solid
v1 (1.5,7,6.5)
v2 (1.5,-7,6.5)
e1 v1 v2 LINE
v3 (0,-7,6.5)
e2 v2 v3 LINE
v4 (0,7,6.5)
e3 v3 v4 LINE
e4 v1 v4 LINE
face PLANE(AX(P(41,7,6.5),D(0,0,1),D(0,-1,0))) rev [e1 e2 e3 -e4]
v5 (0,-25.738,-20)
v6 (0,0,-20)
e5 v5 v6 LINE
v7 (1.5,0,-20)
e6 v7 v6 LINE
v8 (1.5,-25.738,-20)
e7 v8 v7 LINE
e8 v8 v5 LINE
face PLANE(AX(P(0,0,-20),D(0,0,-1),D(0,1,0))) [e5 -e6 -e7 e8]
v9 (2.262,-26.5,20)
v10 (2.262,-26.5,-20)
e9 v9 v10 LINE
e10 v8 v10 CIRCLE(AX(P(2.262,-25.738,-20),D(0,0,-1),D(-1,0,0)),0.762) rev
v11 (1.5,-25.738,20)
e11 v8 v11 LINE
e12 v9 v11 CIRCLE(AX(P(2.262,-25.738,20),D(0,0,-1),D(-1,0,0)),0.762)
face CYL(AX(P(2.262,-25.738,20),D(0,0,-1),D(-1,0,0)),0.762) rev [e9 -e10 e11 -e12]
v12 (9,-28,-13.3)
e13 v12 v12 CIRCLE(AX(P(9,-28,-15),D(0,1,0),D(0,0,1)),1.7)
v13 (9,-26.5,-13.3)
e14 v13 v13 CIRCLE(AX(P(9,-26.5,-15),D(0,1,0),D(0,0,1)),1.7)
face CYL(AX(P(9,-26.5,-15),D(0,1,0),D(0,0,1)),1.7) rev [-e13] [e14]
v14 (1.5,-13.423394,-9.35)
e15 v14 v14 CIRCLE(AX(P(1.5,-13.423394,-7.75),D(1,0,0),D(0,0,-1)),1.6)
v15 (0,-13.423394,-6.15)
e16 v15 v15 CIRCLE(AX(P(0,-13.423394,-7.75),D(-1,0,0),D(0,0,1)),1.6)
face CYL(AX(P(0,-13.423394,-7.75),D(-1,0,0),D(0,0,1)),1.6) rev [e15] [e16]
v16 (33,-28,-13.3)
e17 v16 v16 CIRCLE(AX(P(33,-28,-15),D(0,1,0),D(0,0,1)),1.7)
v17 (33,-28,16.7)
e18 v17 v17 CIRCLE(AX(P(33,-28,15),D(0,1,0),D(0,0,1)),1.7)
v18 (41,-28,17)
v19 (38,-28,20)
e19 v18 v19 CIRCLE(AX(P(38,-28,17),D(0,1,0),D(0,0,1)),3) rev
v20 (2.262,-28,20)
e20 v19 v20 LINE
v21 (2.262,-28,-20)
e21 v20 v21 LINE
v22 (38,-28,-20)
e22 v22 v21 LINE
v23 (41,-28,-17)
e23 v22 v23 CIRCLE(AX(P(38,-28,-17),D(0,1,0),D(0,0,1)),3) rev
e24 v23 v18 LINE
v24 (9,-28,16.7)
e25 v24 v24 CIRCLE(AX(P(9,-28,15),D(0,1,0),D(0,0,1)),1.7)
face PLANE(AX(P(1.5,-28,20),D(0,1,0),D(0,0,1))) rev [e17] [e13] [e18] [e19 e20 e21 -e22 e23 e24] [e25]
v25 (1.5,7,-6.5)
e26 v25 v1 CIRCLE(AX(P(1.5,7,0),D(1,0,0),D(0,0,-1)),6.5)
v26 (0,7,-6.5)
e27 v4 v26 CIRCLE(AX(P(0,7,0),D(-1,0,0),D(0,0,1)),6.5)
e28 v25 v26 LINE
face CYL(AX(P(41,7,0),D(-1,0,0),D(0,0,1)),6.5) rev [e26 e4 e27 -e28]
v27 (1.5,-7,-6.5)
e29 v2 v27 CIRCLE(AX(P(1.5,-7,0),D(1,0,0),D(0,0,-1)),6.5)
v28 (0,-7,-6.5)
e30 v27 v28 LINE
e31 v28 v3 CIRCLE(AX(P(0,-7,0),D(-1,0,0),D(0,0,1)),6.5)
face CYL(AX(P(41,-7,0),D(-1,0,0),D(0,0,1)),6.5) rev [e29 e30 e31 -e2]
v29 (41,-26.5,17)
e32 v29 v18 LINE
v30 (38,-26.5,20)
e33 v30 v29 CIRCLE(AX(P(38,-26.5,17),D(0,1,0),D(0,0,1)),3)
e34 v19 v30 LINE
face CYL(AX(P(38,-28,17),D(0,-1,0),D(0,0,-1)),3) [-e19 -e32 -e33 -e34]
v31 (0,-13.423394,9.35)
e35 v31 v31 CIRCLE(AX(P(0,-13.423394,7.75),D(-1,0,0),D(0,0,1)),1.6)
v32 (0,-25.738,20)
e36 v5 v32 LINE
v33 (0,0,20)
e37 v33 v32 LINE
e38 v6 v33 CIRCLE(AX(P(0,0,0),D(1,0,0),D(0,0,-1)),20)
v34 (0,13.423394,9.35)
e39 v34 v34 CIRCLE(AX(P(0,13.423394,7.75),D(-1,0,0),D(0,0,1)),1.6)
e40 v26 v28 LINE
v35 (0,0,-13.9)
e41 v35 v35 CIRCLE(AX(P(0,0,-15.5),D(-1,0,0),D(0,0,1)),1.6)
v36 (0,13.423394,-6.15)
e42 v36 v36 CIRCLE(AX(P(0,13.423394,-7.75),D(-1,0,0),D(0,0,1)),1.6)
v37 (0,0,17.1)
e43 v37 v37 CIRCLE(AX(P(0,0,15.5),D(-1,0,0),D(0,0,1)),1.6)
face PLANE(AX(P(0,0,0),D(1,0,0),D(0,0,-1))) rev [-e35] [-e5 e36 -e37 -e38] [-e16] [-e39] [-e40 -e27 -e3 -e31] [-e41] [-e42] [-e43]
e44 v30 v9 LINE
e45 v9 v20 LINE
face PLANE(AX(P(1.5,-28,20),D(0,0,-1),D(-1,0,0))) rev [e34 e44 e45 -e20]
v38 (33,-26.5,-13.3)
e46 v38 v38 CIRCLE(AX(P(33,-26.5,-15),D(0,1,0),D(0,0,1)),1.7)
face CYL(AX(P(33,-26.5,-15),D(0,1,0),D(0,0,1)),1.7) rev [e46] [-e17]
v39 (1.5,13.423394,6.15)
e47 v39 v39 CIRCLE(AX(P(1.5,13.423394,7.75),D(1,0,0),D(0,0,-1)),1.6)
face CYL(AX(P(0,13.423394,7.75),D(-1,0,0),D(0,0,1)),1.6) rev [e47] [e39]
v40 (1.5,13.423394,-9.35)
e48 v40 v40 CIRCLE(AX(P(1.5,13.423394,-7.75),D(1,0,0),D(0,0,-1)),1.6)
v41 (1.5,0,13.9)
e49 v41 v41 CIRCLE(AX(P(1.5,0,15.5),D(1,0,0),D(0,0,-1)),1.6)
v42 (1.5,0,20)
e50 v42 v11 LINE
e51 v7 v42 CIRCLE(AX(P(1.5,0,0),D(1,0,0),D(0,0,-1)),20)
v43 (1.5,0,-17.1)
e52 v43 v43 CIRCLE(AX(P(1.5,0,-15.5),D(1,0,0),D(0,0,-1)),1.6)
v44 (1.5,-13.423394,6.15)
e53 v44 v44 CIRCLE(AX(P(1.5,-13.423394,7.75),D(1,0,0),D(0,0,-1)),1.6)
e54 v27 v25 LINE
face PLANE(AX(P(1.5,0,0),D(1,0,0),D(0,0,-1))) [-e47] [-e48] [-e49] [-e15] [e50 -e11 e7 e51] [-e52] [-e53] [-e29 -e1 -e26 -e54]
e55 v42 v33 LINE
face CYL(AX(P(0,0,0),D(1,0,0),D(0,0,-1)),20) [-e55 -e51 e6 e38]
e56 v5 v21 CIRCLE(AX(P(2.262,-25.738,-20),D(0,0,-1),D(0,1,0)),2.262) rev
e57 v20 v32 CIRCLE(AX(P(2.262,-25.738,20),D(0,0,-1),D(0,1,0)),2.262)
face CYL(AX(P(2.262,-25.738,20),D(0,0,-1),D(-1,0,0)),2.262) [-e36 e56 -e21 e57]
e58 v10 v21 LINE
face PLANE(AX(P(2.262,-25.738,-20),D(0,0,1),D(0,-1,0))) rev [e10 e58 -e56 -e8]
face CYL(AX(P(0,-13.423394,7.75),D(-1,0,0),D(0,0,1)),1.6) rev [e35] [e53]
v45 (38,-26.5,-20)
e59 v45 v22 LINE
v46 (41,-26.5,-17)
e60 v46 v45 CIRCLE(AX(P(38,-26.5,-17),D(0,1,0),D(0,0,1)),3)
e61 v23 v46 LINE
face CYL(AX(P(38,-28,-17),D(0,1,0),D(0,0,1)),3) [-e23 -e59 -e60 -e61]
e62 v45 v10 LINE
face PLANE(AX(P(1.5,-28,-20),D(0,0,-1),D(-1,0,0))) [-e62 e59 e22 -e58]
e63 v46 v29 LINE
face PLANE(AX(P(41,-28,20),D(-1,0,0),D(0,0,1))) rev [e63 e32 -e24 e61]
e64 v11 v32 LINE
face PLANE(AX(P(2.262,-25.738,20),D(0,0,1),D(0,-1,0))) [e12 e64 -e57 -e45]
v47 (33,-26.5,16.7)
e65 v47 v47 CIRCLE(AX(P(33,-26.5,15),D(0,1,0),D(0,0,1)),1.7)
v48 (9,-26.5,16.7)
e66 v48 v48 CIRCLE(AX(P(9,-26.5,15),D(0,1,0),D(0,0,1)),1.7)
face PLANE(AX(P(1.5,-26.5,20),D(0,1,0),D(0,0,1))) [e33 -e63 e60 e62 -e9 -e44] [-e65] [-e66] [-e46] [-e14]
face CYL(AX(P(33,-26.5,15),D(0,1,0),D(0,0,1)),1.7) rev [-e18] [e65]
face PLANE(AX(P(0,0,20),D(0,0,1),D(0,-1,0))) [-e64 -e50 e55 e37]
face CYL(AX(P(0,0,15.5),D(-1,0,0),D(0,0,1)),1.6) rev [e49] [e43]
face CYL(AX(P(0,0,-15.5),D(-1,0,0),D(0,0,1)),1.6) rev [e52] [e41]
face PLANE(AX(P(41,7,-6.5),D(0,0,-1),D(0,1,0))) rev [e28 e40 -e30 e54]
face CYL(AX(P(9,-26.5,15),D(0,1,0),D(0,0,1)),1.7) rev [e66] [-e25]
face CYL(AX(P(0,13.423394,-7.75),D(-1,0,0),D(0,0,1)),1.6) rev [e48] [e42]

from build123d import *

# Parameters (mm, degrees)
BOSS_EXTRUDE1_DEPTH    = 1.5
SKETCH2_W              = 41
SKETCH2_H              = 40
BOSS_EXTRUDE2_DEPTH    = 1.5
CONVERT_SOLID1_START   = -20
CONVERT_SOLID1_DEPTH   = 40
CONVERT_SOLID1_2_DEPTH = 40
M3_CLEARANCE_HOLE1_D   = 3.2
CIRPATTERN1_COUNT      = 6
CUT_EXTRUDE1_DEPTH     = 54.525694764
M3_CLEARANCE_HOLE2_D   = 3.4
LPATTERN1_COUNT        = 2
LPATTERN1_PITCH        = 24
LPATTERN1_COPY_1_D     = 3.4
FILLET1_R              = 3


# Read off the part's stored shape, not the designer's step: Convert-Solid1
with BuildPart() as part:
    # Sketch1 → Boss-Extrude1 (new body)
    with BuildSketch(Plane(origin=(0, 0, 0), x_dir=(0, 0, -1), z_dir=(1, 0, 0))):
        with BuildLine():
            Line((-20, 0), (-20, -28))
            Line((-20, -28), (20, -28))
            Line((20, -28), (20, 0))
            ThreePointArc((20, 0), (0, 20), (-20, 0))
        make_face()
    extrude(amount=BOSS_EXTRUDE1_DEPTH)

    # Sketch2 → Boss-Extrude2 (add)
    with BuildSketch(Plane.XZ.offset(28)):
        with Locations((20.5, 0)):
            Rectangle(SKETCH2_W, SKETCH2_H)
    extrude(amount=-BOSS_EXTRUDE2_DEPTH)

    # Convert-Solid1 outline → Convert-Solid1 (cut)
    with BuildSketch(Plane.XY.offset(CONVERT_SOLID1_START)):
        with BuildLine():
            Line((0, -28), (2.262, -28))
            ThreePointArc((2.262, -28), (0.662524461, -27.337475539), (0, -25.738))
            Line((0, -25.738), (0, -28))
        make_face()
    extrude(amount=CONVERT_SOLID1_DEPTH, mode=Mode.SUBTRACT)

    # Convert-Solid1 2 outline → Convert-Solid1 2 (add)
    with BuildSketch(Plane.XY.offset(CONVERT_SOLID1_START)):
        with BuildLine():
            Line((1.5, -26.5), (2.262, -26.5))
            ThreePointArc((2.262, -26.5), (1.723184633, -26.276815367), (1.5, -25.738))
            Line((1.5, -25.738), (1.5, -26.5))
        make_face()
    extrude(amount=CONVERT_SOLID1_2_DEPTH)

    # M3 Clearance Hole1 (through all)
    with Locations(Plane.ZY):
        with Locations((-15.5, 0)):
            m3_clearance_hole1 = Hole(M3_CLEARANCE_HOLE1_D / 2)

    # CirPattern1: M3 Clearance Hole1 ×6 about axis
    cirpattern1_axis = Axis((0, 0, 0), (1, 0, 0))
    for i in range(1, CIRPATTERN1_COUNT):
        add(m3_clearance_hole1.rotate(cirpattern1_axis, i * 360 / CIRPATTERN1_COUNT), mode=Mode.SUBTRACT)

    # Sketch9 → Cut-Extrude1 (cut, through all)
    with BuildSketch(Plane.ZY):
        with BuildLine():
            Line((6.5, 7), (6.5, -7))
            ThreePointArc((6.5, -7), (0, -13.5), (-6.5, -7))
            Line((-6.5, -7), (-6.5, 7))
            ThreePointArc((-6.5, 7), (0, 13.5), (6.5, 7))
        make_face()
    extrude(amount=-CUT_EXTRUDE1_DEPTH, mode=Mode.SUBTRACT)

    # M3 Clearance Hole2 (through all)
    with Locations(Plane(origin=(0, -26.5, 0), x_dir=(1, 0, 0), z_dir=(0, 1, 0))):
        with Locations((33, 15)):
            m3_clearance_hole2 = Hole(M3_CLEARANCE_HOLE2_D / 2)

    # Mirror1: M3 Clearance Hole2 across plane
    add(m3_clearance_hole2.mirror(Plane.XY), mode=Mode.SUBTRACT)

    # LPattern1: M3 Clearance Hole2 ×2
    with Locations(*[(-i * LPATTERN1_PITCH, 0, 0) for i in range(1, LPATTERN1_COUNT)]):
        add(m3_clearance_hole2, mode=Mode.SUBTRACT)

    # LPattern1 copy 1 (through all)
    with Locations(Plane(origin=(-24, -26.5, 0), x_dir=(1, 0, 0), z_dir=(0, 1, 0))):
        with Locations((33, -15)):
            Hole(LPATTERN1_COPY_1_D / 2)

    # Fillet1
    fillet1_edges = [part.edges().sort_by_distance(p)[0] for p in [
        (41, -27.25, 20),
        (41, -27.25, -20),
    ]]
    fillet(fillet1_edges, radius=FILLET1_R)


solid = part.part
